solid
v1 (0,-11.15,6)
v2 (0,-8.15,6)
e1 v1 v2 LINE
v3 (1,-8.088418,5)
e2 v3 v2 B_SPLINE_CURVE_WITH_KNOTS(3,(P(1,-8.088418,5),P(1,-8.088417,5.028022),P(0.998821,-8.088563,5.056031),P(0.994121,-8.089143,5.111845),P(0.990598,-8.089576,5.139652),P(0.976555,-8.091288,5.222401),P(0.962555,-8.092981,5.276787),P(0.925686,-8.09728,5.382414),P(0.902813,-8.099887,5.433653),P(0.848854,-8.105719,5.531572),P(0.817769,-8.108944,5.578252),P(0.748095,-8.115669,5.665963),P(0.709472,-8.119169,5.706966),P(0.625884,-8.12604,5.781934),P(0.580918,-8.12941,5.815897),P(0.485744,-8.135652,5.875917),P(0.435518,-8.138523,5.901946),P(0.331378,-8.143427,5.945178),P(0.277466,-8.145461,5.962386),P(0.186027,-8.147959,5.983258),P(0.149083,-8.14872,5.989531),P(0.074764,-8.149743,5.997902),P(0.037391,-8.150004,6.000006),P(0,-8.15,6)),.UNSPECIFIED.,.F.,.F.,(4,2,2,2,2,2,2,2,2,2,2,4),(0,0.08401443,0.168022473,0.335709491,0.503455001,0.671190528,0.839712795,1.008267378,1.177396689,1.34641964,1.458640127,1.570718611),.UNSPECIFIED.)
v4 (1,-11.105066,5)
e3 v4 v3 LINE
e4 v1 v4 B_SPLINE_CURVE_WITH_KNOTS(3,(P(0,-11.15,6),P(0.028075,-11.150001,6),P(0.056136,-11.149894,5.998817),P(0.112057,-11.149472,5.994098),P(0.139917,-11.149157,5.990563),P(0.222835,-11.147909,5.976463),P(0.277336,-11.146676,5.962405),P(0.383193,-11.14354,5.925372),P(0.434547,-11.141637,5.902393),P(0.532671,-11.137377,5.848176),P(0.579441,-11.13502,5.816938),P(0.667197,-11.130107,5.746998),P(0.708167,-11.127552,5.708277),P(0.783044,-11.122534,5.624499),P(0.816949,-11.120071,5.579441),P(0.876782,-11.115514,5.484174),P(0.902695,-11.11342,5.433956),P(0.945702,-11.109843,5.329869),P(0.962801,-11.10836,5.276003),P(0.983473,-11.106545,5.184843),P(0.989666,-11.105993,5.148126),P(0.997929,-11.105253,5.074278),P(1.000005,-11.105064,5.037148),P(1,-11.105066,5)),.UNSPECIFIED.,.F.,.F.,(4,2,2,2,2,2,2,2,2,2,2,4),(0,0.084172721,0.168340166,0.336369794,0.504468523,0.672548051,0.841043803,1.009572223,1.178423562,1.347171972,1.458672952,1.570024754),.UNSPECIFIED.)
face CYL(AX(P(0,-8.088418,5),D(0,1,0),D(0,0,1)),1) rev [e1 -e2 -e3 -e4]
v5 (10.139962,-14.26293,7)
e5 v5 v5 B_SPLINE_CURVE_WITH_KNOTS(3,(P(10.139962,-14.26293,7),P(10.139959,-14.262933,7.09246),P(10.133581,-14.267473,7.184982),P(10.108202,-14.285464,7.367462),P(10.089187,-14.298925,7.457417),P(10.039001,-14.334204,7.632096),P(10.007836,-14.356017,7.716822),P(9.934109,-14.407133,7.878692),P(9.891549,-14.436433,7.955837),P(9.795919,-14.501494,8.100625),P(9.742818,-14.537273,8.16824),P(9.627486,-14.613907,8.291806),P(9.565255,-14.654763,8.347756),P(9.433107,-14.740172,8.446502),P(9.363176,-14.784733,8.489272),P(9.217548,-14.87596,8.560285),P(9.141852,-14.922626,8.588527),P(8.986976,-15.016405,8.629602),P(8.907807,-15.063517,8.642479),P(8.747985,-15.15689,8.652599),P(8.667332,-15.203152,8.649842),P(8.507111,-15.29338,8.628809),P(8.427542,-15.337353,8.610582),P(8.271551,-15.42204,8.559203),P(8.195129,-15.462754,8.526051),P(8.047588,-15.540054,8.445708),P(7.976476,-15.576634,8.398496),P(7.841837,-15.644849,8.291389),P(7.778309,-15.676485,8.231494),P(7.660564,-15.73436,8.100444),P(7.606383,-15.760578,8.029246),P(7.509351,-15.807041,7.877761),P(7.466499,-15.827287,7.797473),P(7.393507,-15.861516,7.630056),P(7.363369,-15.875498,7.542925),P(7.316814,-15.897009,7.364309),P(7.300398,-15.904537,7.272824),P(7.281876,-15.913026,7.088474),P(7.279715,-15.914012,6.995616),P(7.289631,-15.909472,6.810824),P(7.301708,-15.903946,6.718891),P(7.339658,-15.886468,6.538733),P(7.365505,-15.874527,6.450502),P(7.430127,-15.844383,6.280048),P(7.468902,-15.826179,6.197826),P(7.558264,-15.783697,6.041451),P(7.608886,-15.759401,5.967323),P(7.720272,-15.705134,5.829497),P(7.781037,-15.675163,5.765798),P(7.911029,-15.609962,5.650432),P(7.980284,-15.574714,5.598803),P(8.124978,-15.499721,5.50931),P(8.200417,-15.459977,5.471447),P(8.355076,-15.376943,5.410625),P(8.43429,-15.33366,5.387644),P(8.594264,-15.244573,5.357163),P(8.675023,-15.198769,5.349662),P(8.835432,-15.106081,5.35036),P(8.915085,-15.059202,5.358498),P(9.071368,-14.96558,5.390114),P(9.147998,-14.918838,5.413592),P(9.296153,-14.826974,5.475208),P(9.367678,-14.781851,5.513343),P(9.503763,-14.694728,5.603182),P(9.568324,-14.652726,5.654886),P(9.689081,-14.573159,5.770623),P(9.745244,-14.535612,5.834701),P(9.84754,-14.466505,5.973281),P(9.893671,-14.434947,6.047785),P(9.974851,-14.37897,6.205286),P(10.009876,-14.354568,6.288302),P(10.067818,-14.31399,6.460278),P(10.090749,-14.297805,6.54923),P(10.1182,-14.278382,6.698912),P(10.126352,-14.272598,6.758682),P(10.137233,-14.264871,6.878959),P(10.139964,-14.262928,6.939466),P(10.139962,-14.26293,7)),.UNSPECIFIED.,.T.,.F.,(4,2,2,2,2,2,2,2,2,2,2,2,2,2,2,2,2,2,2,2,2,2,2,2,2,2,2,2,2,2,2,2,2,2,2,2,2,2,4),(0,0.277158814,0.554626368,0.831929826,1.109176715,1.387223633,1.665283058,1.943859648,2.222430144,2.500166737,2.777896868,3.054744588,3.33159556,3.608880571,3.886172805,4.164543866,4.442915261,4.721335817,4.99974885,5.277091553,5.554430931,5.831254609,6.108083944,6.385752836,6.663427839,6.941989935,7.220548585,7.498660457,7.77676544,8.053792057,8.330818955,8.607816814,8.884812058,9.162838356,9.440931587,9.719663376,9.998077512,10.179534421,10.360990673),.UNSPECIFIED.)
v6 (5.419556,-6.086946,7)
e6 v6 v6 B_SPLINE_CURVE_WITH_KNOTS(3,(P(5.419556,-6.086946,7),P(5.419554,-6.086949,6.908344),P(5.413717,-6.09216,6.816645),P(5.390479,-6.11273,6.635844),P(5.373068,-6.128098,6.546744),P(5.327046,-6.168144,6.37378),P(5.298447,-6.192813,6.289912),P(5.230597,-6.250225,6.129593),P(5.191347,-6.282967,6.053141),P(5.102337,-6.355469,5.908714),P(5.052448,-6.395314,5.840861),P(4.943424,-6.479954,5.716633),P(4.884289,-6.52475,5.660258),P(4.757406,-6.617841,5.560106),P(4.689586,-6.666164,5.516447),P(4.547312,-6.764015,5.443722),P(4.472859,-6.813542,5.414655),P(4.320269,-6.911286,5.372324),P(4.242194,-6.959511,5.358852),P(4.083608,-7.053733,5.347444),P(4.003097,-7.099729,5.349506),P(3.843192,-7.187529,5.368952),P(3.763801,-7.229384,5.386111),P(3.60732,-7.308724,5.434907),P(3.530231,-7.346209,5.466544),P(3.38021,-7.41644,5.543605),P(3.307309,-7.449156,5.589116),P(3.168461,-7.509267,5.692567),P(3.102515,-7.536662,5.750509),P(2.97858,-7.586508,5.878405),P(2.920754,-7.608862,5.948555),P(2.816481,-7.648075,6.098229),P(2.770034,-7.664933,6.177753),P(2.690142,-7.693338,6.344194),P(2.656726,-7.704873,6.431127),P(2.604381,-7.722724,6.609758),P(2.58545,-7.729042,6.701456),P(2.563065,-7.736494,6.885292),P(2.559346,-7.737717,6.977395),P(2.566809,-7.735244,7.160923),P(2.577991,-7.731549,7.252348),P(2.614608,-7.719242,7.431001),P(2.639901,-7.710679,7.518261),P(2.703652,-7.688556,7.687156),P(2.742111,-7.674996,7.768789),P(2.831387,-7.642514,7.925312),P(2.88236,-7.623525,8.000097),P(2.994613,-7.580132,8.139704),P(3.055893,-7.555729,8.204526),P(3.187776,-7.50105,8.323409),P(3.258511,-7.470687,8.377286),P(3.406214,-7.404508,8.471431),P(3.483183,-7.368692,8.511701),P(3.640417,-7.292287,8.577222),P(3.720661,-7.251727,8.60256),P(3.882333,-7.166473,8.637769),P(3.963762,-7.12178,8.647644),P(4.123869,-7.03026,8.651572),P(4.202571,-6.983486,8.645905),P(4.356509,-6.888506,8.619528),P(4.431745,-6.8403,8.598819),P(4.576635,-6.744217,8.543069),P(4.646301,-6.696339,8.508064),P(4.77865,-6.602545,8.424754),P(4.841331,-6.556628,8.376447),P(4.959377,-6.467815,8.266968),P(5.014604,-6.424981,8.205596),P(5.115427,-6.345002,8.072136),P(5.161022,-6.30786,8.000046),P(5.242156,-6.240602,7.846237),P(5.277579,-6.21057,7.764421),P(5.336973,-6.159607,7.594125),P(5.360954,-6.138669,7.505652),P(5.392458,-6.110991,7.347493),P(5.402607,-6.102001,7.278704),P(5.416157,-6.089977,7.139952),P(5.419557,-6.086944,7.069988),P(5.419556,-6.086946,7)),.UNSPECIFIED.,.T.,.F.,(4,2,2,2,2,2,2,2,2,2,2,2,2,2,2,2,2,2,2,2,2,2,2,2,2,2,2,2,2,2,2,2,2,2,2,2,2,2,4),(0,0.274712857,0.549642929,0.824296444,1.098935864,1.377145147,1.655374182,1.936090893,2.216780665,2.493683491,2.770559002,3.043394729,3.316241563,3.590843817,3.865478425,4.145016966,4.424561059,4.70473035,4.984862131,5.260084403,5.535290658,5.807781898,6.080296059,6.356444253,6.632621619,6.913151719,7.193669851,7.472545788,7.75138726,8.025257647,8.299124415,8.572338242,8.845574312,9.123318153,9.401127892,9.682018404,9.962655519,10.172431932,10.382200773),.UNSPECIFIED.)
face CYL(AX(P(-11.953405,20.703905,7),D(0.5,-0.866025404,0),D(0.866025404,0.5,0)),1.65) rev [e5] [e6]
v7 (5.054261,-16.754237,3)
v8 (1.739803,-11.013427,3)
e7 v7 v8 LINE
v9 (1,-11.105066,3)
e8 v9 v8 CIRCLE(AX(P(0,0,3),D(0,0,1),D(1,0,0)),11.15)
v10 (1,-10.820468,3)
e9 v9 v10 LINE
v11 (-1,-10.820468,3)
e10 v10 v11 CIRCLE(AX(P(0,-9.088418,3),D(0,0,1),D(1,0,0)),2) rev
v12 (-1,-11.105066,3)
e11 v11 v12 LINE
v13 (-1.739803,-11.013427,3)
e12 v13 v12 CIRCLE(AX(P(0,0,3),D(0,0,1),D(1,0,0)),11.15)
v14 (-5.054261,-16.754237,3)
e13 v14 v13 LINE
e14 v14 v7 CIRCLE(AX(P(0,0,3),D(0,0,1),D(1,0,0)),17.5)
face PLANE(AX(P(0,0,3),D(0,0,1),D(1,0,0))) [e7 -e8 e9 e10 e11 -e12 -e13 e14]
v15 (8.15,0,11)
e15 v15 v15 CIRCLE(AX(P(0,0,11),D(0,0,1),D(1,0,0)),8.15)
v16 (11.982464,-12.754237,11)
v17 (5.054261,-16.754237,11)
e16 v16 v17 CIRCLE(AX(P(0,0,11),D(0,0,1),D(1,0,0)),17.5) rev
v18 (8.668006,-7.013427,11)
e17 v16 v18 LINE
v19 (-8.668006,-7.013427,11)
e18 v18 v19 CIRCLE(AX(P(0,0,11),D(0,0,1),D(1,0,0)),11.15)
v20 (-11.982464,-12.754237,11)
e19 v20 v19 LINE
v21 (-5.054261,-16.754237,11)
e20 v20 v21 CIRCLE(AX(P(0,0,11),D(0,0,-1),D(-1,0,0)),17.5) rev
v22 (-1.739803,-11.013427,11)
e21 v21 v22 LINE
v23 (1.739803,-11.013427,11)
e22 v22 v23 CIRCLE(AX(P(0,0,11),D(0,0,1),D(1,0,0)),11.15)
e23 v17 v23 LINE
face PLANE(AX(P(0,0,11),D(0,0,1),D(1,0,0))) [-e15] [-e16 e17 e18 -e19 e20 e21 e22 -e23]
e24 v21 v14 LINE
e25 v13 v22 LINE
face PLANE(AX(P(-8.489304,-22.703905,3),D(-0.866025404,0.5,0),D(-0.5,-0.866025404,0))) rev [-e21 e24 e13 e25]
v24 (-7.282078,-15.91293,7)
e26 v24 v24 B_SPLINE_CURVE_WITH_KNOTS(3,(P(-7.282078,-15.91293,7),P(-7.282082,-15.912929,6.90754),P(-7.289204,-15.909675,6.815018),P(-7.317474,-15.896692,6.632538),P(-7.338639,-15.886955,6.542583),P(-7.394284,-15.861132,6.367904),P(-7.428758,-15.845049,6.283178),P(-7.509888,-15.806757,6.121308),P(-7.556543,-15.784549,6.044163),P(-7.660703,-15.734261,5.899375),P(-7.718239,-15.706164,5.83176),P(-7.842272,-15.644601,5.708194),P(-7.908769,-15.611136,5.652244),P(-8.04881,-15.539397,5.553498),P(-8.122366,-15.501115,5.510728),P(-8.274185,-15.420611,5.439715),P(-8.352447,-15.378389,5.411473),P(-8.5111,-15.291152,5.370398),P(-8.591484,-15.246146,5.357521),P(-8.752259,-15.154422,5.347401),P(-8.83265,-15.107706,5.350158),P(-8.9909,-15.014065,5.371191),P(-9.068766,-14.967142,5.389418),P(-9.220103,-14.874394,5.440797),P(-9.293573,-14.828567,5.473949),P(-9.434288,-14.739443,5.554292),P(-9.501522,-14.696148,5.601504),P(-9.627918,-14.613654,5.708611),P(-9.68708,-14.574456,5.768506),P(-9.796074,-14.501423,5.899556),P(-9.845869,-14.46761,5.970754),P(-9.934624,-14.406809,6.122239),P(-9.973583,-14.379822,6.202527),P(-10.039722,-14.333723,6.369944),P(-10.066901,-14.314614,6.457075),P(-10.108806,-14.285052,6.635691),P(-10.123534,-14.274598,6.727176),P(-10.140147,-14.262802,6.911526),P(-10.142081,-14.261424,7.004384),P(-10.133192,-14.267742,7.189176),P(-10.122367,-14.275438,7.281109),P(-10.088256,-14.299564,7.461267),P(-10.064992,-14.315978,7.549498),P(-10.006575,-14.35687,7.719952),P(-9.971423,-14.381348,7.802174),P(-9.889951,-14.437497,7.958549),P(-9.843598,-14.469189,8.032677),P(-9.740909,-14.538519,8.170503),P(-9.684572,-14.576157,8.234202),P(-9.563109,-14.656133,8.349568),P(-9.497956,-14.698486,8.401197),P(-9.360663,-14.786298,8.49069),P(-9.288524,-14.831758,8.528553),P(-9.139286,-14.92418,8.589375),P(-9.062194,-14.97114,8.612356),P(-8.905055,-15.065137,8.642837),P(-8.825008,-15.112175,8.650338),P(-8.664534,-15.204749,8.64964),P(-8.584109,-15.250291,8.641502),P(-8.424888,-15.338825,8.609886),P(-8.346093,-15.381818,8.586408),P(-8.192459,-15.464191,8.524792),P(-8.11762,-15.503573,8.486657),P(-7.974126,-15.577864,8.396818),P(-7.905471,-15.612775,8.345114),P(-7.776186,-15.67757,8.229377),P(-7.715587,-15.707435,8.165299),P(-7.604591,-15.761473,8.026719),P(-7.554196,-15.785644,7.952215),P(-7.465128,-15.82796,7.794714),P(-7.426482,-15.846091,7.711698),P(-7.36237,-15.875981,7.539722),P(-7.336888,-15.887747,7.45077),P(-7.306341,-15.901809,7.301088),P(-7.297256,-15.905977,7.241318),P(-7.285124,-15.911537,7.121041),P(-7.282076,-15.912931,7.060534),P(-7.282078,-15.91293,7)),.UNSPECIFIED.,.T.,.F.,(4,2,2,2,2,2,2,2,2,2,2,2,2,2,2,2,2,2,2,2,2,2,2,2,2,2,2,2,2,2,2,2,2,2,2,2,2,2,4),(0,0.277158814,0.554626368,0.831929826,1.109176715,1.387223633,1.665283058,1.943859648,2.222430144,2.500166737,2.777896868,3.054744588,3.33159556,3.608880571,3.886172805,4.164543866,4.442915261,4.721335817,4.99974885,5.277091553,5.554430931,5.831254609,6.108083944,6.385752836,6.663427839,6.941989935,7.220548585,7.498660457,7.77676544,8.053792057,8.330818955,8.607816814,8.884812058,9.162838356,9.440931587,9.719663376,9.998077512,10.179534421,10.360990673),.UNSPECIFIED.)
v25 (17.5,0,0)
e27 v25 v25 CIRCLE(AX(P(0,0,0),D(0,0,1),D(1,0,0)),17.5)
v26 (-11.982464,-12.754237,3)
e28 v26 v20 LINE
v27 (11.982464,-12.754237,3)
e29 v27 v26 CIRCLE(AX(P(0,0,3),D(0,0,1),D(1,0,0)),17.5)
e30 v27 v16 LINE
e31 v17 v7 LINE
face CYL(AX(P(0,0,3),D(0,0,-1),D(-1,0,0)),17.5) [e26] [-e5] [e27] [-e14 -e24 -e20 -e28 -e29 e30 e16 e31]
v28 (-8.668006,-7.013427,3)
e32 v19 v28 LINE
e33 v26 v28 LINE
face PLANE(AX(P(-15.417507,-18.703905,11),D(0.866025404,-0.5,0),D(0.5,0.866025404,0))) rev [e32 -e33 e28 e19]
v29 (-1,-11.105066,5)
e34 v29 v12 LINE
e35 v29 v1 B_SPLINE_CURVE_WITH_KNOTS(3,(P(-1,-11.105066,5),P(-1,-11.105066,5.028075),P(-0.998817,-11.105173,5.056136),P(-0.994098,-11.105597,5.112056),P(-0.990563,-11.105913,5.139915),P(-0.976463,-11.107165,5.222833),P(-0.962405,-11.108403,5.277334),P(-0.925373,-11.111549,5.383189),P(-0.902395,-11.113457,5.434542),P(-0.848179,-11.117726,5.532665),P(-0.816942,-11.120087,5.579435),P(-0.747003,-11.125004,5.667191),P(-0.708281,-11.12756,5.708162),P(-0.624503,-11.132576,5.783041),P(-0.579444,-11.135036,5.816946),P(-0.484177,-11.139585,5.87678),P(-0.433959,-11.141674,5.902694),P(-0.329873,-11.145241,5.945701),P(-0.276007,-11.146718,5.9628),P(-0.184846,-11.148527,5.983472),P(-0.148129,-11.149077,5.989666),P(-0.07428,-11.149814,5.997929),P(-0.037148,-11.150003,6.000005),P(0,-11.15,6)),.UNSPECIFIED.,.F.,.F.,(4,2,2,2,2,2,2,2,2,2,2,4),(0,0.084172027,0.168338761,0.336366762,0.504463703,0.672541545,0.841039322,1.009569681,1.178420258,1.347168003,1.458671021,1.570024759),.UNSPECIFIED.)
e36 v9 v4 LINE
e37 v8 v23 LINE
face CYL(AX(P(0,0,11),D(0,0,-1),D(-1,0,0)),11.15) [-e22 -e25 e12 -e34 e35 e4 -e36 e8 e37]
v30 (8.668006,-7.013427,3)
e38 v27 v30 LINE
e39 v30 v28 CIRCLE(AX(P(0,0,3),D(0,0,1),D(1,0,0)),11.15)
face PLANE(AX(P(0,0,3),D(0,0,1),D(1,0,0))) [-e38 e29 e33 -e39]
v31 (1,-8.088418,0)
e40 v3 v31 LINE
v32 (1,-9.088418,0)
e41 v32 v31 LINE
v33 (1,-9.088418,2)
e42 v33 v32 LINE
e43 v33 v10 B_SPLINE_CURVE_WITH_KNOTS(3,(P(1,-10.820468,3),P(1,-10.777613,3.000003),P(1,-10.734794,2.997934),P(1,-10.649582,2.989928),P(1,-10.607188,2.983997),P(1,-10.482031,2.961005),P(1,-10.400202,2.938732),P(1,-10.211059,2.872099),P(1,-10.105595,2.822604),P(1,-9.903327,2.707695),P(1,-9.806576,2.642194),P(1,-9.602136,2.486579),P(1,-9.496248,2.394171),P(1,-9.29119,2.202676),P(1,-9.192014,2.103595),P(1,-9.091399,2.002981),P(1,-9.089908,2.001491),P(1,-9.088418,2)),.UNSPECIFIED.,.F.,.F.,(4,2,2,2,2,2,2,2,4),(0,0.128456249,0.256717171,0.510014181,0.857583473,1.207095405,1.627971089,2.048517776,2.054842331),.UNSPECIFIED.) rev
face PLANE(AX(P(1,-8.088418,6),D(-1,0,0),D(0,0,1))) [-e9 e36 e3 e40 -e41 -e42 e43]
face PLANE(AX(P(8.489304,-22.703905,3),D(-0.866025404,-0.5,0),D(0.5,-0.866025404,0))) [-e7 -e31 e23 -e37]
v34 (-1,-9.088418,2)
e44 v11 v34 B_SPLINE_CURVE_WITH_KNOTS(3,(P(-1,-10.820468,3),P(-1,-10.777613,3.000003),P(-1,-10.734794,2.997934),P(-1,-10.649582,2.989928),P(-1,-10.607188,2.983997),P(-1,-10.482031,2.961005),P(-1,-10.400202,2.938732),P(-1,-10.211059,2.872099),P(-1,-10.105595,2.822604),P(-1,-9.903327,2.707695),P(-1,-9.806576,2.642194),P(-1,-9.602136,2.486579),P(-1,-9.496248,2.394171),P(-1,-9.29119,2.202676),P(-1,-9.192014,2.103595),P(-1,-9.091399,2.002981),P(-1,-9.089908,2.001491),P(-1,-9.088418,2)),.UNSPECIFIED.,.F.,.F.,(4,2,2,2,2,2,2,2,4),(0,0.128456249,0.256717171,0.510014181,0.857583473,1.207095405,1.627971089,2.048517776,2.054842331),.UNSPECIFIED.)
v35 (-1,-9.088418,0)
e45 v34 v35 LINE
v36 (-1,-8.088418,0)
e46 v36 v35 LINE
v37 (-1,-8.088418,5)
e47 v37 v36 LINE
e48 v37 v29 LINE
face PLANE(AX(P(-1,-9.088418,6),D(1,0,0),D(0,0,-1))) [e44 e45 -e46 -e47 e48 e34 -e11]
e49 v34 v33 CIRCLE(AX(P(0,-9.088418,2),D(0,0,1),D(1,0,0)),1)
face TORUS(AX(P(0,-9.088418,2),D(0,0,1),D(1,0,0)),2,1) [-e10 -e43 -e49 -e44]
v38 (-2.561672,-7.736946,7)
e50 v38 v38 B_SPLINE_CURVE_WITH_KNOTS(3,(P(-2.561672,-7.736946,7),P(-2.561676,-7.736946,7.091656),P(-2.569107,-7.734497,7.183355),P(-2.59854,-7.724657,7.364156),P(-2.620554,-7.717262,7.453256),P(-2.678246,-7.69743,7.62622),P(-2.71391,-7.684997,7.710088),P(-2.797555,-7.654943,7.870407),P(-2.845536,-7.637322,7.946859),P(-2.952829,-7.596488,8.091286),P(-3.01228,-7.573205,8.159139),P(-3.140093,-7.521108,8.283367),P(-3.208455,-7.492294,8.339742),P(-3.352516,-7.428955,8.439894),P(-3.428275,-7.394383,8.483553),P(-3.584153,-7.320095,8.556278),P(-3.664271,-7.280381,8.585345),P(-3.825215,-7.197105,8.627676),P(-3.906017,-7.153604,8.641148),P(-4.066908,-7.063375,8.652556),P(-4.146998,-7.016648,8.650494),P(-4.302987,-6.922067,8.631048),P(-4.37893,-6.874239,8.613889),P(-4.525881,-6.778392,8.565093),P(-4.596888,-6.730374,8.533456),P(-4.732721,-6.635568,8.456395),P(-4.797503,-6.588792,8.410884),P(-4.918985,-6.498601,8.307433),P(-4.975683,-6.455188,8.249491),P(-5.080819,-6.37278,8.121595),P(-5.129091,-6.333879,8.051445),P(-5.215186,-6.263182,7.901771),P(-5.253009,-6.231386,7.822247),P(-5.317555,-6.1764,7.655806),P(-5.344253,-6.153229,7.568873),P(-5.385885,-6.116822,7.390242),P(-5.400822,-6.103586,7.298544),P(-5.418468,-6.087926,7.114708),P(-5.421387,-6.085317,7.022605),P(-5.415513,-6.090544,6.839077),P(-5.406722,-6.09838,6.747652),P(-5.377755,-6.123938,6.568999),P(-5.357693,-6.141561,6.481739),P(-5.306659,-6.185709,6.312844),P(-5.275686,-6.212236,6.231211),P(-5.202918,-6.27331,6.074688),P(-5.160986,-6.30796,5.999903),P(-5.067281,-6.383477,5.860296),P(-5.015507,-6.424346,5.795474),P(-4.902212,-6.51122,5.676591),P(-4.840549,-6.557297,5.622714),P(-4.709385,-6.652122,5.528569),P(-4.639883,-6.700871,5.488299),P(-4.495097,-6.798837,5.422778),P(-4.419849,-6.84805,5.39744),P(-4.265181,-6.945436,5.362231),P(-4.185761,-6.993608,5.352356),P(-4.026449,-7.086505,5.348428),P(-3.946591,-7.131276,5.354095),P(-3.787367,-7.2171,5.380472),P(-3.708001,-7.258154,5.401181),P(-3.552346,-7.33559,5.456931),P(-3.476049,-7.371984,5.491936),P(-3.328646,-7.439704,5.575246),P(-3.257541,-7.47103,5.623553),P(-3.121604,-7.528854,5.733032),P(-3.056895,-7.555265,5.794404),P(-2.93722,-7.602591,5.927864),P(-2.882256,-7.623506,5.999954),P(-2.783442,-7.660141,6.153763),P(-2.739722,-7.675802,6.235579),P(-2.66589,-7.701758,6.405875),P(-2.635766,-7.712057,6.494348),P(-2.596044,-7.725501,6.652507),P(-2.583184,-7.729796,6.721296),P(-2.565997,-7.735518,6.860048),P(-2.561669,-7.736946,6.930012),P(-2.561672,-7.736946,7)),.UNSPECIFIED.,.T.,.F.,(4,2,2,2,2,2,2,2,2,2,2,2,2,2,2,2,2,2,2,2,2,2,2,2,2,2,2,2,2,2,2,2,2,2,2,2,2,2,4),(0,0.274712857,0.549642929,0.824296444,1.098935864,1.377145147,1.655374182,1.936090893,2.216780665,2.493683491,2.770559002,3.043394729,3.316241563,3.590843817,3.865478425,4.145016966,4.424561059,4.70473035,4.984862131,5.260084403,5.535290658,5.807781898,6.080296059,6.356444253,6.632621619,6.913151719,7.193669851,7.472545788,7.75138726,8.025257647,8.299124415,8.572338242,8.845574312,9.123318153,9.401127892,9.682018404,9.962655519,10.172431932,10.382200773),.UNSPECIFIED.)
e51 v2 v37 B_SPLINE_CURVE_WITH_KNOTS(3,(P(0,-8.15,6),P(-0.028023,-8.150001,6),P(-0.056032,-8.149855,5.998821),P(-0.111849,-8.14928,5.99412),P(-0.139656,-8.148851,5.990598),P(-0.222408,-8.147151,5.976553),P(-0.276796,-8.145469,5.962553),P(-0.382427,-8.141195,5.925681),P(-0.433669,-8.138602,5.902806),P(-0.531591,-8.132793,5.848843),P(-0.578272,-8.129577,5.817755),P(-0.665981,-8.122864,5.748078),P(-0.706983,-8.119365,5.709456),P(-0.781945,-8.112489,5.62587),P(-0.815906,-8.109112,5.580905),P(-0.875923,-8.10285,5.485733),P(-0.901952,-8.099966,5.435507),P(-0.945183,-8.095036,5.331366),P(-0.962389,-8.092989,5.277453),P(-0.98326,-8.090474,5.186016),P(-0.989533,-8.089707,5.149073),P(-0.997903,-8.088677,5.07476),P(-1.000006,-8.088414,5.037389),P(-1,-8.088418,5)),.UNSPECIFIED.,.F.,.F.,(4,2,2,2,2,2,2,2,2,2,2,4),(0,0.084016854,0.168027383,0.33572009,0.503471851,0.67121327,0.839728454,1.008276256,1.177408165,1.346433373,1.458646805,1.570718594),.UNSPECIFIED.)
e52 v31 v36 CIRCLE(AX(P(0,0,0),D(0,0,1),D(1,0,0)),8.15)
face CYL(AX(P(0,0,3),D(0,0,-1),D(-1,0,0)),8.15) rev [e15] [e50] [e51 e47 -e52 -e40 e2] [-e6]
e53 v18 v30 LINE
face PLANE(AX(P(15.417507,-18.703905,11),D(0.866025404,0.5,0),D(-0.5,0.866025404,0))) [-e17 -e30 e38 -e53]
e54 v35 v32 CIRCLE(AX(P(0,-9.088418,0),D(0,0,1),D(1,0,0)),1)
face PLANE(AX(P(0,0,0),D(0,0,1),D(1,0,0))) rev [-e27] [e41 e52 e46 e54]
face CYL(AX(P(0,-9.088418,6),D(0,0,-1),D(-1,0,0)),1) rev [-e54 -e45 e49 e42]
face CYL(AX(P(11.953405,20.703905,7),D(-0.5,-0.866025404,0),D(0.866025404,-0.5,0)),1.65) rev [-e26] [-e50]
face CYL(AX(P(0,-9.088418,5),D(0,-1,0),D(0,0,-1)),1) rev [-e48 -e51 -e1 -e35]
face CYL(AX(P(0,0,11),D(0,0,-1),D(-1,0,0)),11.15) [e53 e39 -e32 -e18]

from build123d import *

# Parameters (mm, degrees)
SKETCH1_R                            = 17.5
SKETCH1_R_2                          = 8.15
BOSS_EXTRUDE1_DEPTH                  = 3
SKETCH2_R                            = 11.15
SKETCH2_R_2                          = 8.15
BOSS_EXTRUDE2_DEPTH                  = 8
BOSS_EXTRUDE5_REACH                  = 39.295
BOSS_EXTRUDE5_END_RADIUS             = 17.5
SKETCH4_W                            = 8
SKETCH4_H                            = 8
BOSS_EXTRUDE5_DIRECTION_2_REACH      = 39.295
BOSS_EXTRUDE5_DIRECTION_2_END_RADIUS = 11.15
CUT_EXTRUDE1_REACH                   = 39.295
CUT_EXTRUDE1_END_RADIUS              = 8.15
SKETCH3_R                            = 1.65
CUT_EXTRUDE1_DIRECTION_2_REACH       = 39.295
CUT_EXTRUDE1_DIRECTION_2_END_RADIUS  = 17.5
CUT_EXTRUDE2_DEPTH                   = 3
CUT_EXTRUDE2_DEPTH_BACK              = 27.009613773
SKETCH6_W                            = 2
SKETCH6_H                            = 9.382987565
CUT_EXTRUDE3_DEPTH                   = 3
FILLET2_R                            = 1


with BuildPart() as part:
    # Sketch1 → Boss-Extrude1 (new body)
    with BuildSketch(Plane.XY):
        Circle(SKETCH1_R)
        Circle(SKETCH1_R_2, mode=Mode.SUBTRACT)
    extrude(amount=BOSS_EXTRUDE1_DEPTH)

    # Sketch2 → Boss-Extrude2 (add)
    with BuildSketch(Plane.XY.offset(3)):
        Circle(SKETCH2_R)
        Circle(SKETCH2_R_2, mode=Mode.SUBTRACT)
    extrude(amount=BOSS_EXTRUDE2_DEPTH)

    # Boss-Extrude5: up to this cylinder (the profile starts inside it)
    boss_extrude5_end = Plane(origin=(0, 0, 7), z_dir=(0, 0, -1)) * Cylinder(BOSS_EXTRUDE5_END_RADIUS, 114.59, mode=Mode.PRIVATE)
    # Sketch4 → Boss-Extrude5 (add, up to the surface)
    with BuildSketch(Plane(origin=(-5.575, -9.656183252, 0), x_dir=(0, 0, -1), z_dir=(-0.500000000000001, -0.866025403784438, 0)), mode=Mode.PRIVATE) as boss_extrude5_sk1:
        with Locations((-7, 0)):
            Rectangle(SKETCH4_W, SKETCH4_H)
    boss_extrude5_tool1 = extrude(boss_extrude5_sk1.sketch, amount=BOSS_EXTRUDE5_REACH, mode=Mode.PRIVATE) & boss_extrude5_end
    boss_extrude5 = boss_extrude5_tool1.solids().sort_by_distance((-5.575, -9.656183, 7))[0]
    add(boss_extrude5)

    # Boss-Extrude5 direction 2: up to this cylinder (the profile starts outside it)
    boss_extrude5_direction_2_end = Plane(origin=(0, 0, 7), z_dir=(0, 0, -1)) * Cylinder(BOSS_EXTRUDE5_DIRECTION_2_END_RADIUS, 101.89, mode=Mode.PRIVATE)
    # Sketch4 → Boss-Extrude5 direction 2 (add, up to the surface)
    with BuildSketch(Plane(origin=(-5.575, -9.656183252, 0), x_dir=(0, 0, -1), z_dir=(-0.500000000000001, -0.866025403784438, 0)), mode=Mode.PRIVATE) as boss_extrude5_direction_2_sk1:
        with Locations((-7, 0)):
            Rectangle(SKETCH4_W, SKETCH4_H)
    boss_extrude5_direction_2_tool1 = extrude(boss_extrude5_direction_2_sk1.sketch, amount=-BOSS_EXTRUDE5_DIRECTION_2_REACH, mode=Mode.PRIVATE) - boss_extrude5_direction_2_end
    boss_extrude5_direction_2 = boss_extrude5_direction_2_tool1.solids().sort_by_distance((-5.575, -9.656183, 7))[0] + boss_extrude5_direction_2_tool1.solids().sort_by_distance((-5.575, -9.656183, 7))[1]
    add(boss_extrude5_direction_2)
    boss_extrude5 = boss_extrude5 + boss_extrude5_direction_2  # both directions under the feature's name, for the pattern or mirror that repeats it

    # Cut-Extrude1: up to this cylinder (the profile starts outside it)
    cut_extrude1_end = Plane(origin=(0, 0, 7), z_dir=(0, 0, -1)) * Cylinder(CUT_EXTRUDE1_END_RADIUS, 95.89, mode=Mode.PRIVATE)
    # Sketch3 → Cut-Extrude1 (cut, up to the surface)
    with BuildSketch(Plane(origin=(-5.575, -9.656183252, 0), x_dir=(0, 0, -1), z_dir=(-0.500000000000001, -0.866025403784438, 0)), mode=Mode.PRIVATE) as cut_extrude1_sk1:
        with Locations(Location((-7, 0, 0), (0, 0, 90))):
            Circle(SKETCH3_R)
    cut_extrude1_tool1 = extrude(cut_extrude1_sk1.sketch, amount=-CUT_EXTRUDE1_REACH, mode=Mode.PRIVATE) - cut_extrude1_end
    cut_extrude1 = cut_extrude1_tool1.solids().sort_by_distance((-5.575, -9.656183, 7))[0]
    add(cut_extrude1, mode=Mode.SUBTRACT)

    # Cut-Extrude1 direction 2: up to this cylinder (the profile starts inside it)
    cut_extrude1_direction_2_end = Plane(origin=(0, 0, 7), z_dir=(0, 0, -1)) * Cylinder(CUT_EXTRUDE1_DIRECTION_2_END_RADIUS, 114.59, mode=Mode.PRIVATE)
    # Sketch3 → Cut-Extrude1 direction 2 (cut, up to the surface)
    with BuildSketch(Plane(origin=(-5.575, -9.656183252, 0), x_dir=(0, 0, -1), z_dir=(-0.500000000000001, -0.866025403784438, 0)), mode=Mode.PRIVATE) as cut_extrude1_direction_2_sk1:
        with Locations(Location((-7, 0, 0), (0, 0, 90))):
            Circle(SKETCH3_R)
    cut_extrude1_direction_2_tool1 = extrude(cut_extrude1_direction_2_sk1.sketch, amount=CUT_EXTRUDE1_DIRECTION_2_REACH, mode=Mode.PRIVATE) & cut_extrude1_direction_2_end
    cut_extrude1_direction_2 = cut_extrude1_direction_2_tool1.solids().sort_by_distance((-5.575, -9.656183, 7))[0]
    add(cut_extrude1_direction_2, mode=Mode.SUBTRACT)
    cut_extrude1 = cut_extrude1 + cut_extrude1_direction_2  # both directions under the feature's name, for the pattern or mirror that repeats it

    # Mirror1: Boss-Extrude5, Cut-Extrude1 across plane
    add(boss_extrude5.mirror(Plane(origin=(0, 0, 0), x_dir=(0, 0, 1), z_dir=(1, 0, 0))))
    add(cut_extrude1.mirror(Plane(origin=(0, 0, 0), x_dir=(0, 0, 1), z_dir=(1, 0, 0))), mode=Mode.SUBTRACT)

    # Sketch5 → Cut-Extrude2 (cut, two sides: drawn at the far end of the back side and taken through both)
    with BuildSketch(Plane.XY.offset(3).offset(-CUT_EXTRUDE2_DEPTH_BACK)):
        with BuildLine():
            Line((-1, -9.088417645), (-1, -8.088417645))
            Line((-1, -8.088417645), (1, -8.088417645))
            Line((1, -8.088417645), (1, -9.088417645))
            ThreePointArc((1, -9.088417645), (0, -10.088417645), (-1, -9.088417645))
        make_face()
    extrude(amount=CUT_EXTRUDE2_DEPTH + CUT_EXTRUDE2_DEPTH_BACK, mode=Mode.SUBTRACT)

    # Sketch6 → Cut-Extrude3 (cut)
    with BuildSketch(Plane.XY.offset(3)):
        with Locations((0, -12.779911428)):
            Rectangle(SKETCH6_W, SKETCH6_H)
    extrude(amount=CUT_EXTRUDE3_DEPTH, mode=Mode.SUBTRACT)

    # Fillet2
    # the kernel refuses this fillet: 1 mm, written as the material it adds along each edge
    with BuildSketch(Plane(origin=(1, -9.088417645, 6), x_dir=(0, 0, -1), z_dir=(0, -1, 0))) as fillet2_piece_1_section:
        with BuildLine():
            CenterArc((FILLET2_R, -FILLET2_R), FILLET2_R, 90, 90)
            Line((0, -FILLET2_R), (0, 0))
            Line((0, 0), (FILLET2_R, 0))
        make_face()
    fillet2_piece_1 = extrude(amount=4.516648766, mode=Mode.PRIVATE)
    fillet2_piece_1 = fillet2_piece_1 & Plane(origin=(0, 0, 5.777290132), x_dir=(1, 0, 0), z_dir=(0, 0, -1)) * Cylinder(11.15, 14, mode=Mode.PRIVATE)
    add(fillet2_piece_1)
    with BuildSketch(Plane(origin=(-1, -13.605066411, 6), x_dir=(1, 0, 0), z_dir=(0, 1, 0))) as fillet2_piece_2_section:
        with BuildLine():
            CenterArc((FILLET2_R, FILLET2_R), FILLET2_R, 180, 90)
            Line((0, FILLET2_R), (0, 0))
            Line((0, 0), (FILLET2_R, 0))
        make_face()
    fillet2_piece_2 = extrude(amount=4.516648766, mode=Mode.PRIVATE)
    fillet2_piece_2 = fillet2_piece_2 & Plane(origin=(0, 0, 5.777290055), x_dir=(1, 0, 0), z_dir=(0, 0, -1)) * Cylinder(11.15, 14, mode=Mode.PRIVATE)
    add(fillet2_piece_2)
    with BuildSketch(Plane(origin=(-1, -9.088417645, 6), x_dir=(1, 0, 0), z_dir=(0, 1, 0))) as fillet2_piece_3_section:
        with BuildLine():
            CenterArc((FILLET2_R, FILLET2_R), FILLET2_R, 180, 90)
            Line((0, FILLET2_R), (0, 0))
            Line((0, 0), (FILLET2_R, 0))
        make_face()
    fillet2_piece_3 = extrude(amount=3.5, mode=Mode.PRIVATE)
    fillet2_piece_3 = fillet2_piece_3 - Plane(origin=(0, 0, 5.774756303), x_dir=(1, 0, 0), z_dir=(0, 0, -1)) * Cylinder(8.15, 12, mode=Mode.PRIVATE)
    add(fillet2_piece_3)
    with BuildSketch(Plane(origin=(1, -5.588417645, 6), x_dir=(0, 0, -1), z_dir=(0, -1, 0))) as fillet2_piece_4_section:
        with BuildLine():
            CenterArc((FILLET2_R, -FILLET2_R), FILLET2_R, 90, 90)
            Line((0, -FILLET2_R), (0, 0))
            Line((0, 0), (FILLET2_R, 0))
        make_face()
    fillet2_piece_4 = extrude(amount=3.5, mode=Mode.PRIVATE)
    fillet2_piece_4 = fillet2_piece_4 - Plane(origin=(0, 0, 5.77475637), x_dir=(1, 0, 0), z_dir=(0, 0, -1)) * Cylinder(8.15, 12, mode=Mode.PRIVATE)
    add(fillet2_piece_4)
    # the kernel refuses this fillet: 1 mm, written as the material it takes off along each edge
    with BuildSketch(Plane(origin=(0, -9.088417645, 3), x_dir=(0.003141587485879873, 0.9999950652018583, 0), z_dir=(-0.9999950652018583, 0.003141587485879873, 0))) as fillet2_2_piece_1_section:
        with BuildLine():
            CenterArc((1 + FILLET2_R, FILLET2_R), FILLET2_R, 180, 90)
            Line((1 + FILLET2_R, 0), (1, 0))
            Line((1, 0), (1, FILLET2_R))
        make_face()
    fillet2_2_piece_1 = revolve(axis=Axis((0, -9.088417645, 3), (0, 0, -1)), revolution_arc=359.64, mode=Mode.PRIVATE)
    fillet2_2_piece_1 = split(fillet2_2_piece_1, bisect_by=Plane(origin=(1, -10.091717807, 2.766201228), z_dir=(-1, 0, 0)), keep=Keep.TOP, mode=Mode.PRIVATE)
    fillet2_2_piece_1 = split(fillet2_2_piece_1, bisect_by=Plane(origin=(-1, -10.091717807, 2.766201228), z_dir=(1, 0, 0)), keep=Keep.TOP, mode=Mode.PRIVATE)
    add(fillet2_2_piece_1, mode=Mode.SUBTRACT)


solid = part.part
